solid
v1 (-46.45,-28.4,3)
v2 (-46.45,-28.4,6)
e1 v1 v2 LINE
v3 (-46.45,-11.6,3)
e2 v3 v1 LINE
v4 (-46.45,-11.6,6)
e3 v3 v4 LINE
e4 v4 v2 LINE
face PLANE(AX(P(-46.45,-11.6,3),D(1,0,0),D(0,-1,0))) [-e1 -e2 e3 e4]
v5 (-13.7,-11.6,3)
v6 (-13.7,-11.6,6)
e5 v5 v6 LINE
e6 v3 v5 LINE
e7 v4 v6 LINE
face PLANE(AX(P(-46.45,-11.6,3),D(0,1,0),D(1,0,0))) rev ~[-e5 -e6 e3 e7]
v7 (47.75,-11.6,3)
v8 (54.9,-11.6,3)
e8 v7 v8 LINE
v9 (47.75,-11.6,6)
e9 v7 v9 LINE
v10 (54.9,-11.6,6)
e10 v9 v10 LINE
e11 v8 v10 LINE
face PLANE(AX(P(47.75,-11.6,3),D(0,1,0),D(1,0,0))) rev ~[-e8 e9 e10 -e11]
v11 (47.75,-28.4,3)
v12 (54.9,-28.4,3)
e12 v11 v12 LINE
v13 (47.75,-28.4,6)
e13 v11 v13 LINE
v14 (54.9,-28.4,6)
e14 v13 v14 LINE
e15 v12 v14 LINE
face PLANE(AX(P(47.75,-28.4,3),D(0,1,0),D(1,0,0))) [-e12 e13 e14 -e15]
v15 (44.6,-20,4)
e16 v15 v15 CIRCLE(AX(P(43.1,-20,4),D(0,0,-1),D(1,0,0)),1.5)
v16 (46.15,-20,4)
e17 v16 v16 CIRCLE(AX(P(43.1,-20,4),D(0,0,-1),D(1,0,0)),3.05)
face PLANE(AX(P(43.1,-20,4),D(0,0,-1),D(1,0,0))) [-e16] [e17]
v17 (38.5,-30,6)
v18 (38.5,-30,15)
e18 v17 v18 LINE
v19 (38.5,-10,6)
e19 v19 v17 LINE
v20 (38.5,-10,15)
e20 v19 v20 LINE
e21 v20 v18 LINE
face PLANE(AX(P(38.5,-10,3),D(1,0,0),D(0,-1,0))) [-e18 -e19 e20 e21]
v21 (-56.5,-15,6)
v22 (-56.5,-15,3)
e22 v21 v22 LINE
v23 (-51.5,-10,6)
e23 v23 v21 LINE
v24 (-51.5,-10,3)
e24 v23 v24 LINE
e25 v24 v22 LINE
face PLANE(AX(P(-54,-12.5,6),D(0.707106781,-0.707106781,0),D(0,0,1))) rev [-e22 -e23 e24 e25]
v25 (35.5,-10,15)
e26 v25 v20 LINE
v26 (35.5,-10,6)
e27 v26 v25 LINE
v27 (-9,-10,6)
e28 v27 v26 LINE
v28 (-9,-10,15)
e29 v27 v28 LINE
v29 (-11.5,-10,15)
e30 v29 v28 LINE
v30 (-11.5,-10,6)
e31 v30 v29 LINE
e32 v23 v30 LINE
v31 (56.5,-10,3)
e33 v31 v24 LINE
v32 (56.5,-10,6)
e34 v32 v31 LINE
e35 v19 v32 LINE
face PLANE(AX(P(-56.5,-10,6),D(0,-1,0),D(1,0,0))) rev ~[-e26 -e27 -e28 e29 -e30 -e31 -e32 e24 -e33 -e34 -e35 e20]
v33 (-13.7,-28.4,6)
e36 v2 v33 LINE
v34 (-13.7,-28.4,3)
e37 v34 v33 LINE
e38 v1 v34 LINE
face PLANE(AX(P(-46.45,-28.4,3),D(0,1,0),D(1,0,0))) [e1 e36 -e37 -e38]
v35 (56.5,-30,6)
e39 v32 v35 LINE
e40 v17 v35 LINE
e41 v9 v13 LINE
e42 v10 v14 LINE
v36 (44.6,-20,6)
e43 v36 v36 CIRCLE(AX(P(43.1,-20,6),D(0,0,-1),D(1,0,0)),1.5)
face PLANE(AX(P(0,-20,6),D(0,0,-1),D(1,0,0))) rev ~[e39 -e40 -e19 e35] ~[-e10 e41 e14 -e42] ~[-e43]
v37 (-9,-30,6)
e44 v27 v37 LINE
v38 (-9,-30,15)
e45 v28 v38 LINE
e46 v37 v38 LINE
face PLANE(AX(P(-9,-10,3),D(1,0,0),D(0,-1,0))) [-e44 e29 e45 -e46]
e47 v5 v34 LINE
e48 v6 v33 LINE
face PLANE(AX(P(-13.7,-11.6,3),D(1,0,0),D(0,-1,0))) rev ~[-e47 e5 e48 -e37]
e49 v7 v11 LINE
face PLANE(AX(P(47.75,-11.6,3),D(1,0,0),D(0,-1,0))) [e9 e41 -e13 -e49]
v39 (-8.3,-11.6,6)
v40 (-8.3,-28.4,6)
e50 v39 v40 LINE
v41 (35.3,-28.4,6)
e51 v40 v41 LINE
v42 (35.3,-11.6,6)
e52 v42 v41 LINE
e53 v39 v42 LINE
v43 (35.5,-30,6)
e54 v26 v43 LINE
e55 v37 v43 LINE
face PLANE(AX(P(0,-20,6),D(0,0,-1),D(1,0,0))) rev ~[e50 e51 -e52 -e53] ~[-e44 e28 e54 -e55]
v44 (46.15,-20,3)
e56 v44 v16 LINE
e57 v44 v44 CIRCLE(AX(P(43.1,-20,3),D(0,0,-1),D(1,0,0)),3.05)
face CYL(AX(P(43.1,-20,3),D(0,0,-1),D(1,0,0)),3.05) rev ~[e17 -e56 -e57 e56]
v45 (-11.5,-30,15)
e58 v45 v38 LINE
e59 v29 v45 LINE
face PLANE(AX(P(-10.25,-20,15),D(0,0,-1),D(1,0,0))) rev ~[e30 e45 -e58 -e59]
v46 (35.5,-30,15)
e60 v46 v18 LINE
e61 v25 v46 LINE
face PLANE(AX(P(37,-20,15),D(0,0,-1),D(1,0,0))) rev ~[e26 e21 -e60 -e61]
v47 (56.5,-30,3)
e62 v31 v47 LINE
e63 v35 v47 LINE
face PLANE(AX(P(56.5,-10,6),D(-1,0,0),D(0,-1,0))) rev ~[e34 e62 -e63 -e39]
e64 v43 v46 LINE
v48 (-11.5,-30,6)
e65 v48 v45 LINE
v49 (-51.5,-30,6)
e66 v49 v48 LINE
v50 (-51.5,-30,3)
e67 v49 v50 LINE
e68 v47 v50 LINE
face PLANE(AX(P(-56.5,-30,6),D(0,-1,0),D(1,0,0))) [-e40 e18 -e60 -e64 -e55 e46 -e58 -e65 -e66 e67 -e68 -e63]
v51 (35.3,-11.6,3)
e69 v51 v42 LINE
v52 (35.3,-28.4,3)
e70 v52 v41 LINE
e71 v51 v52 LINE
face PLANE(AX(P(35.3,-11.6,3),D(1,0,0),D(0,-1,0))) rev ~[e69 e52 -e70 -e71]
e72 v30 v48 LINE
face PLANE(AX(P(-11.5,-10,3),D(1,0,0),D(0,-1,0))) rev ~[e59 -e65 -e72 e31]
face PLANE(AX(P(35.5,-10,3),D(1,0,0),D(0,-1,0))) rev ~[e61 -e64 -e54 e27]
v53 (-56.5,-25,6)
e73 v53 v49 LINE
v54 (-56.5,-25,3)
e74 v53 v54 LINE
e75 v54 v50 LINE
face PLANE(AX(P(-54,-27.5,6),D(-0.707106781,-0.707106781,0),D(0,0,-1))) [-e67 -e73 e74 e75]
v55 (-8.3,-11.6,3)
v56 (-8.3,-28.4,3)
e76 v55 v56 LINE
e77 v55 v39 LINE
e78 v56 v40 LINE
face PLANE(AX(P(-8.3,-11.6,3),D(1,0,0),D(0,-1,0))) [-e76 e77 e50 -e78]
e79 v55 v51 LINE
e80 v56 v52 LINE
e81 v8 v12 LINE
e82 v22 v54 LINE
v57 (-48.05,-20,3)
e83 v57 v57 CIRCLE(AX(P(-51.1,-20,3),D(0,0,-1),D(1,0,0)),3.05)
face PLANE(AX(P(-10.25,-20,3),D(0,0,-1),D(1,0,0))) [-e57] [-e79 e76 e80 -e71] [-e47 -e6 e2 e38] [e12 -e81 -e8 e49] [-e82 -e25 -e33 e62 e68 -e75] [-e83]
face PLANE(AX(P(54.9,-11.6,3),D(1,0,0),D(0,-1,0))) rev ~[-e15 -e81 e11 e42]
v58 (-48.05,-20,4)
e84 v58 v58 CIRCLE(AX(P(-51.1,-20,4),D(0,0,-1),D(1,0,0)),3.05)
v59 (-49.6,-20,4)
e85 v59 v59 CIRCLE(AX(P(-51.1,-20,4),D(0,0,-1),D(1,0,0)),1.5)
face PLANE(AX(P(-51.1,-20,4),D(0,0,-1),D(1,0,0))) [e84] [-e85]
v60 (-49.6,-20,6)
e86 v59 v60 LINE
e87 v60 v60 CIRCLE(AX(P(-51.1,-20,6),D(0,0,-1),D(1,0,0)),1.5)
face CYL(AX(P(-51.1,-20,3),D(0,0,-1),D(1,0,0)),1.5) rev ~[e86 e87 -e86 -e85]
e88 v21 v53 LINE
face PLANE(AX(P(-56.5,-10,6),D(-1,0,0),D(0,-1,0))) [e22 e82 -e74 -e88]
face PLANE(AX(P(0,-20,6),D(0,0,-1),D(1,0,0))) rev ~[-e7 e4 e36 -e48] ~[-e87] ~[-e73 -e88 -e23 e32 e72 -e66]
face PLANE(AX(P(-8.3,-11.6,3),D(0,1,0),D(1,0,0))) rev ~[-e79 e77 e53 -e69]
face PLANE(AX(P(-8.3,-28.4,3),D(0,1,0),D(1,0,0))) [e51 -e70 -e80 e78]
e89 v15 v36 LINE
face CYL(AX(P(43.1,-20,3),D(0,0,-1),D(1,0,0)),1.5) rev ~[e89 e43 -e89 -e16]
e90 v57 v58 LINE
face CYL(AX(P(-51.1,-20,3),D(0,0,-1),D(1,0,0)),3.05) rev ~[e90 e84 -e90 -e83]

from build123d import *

# Parameters (mm, degrees)
F0_W      = 113
F0_H      = 20
F1_DEPTH  = 3
F2_W      = 2.5
F2_H      = 20
F2_W_2    = 3
F3_DEPTH  = 12
F4_R      = 1.5
F5_DEPTH  = 3
F6_R      = 3.05
F6_R_2    = 1.5
F7_DEPTH  = 1
F8_W      = 32.75
F8_H      = 16.8
F8_W_2    = 43.6
F8_W_3    = 7.15
F9_DEPTH  = 3
F10_SIZE  = 5
F11_ANGLE = 180


# Not quite as in the source:
# - a feature of the source that left no trace in its solid (it failed there, or was rolled back) is left out


with BuildPart() as f1:
    # F0 (on Top) → F1 (new body)
    with BuildSketch(Plane.XY):
        Rectangle(F0_W, F0_H)
    extrude(amount=F1_DEPTH)

    # F2 (on face) → F3 (join)
    with BuildSketch(Plane.XY.offset(3)):
        with Locations((-10.25, 0)):
            Rectangle(F2_W, F2_H)
        with Locations((37, 0)):
            Rectangle(F2_W_2, F2_H)
    extrude(amount=-F3_DEPTH)

    # F4 (on face) → F5 (cut, through all)
    with BuildSketch(Plane.XY.offset(3)):
        with Locations((-51.1, 0)):
            Circle(F4_R)
        with Locations((43.1, 0)):
            Circle(F4_R)
    extrude(amount=-F5_DEPTH, mode=Mode.SUBTRACT)

    # F6 (on face) → F7 (cut)
    with BuildSketch(Plane.XY.offset(3)):
        with Locations((-51.1, 0)):
            Circle(F6_R)
        with Locations((-51.1, 0)):
            Circle(F6_R_2, mode=Mode.SUBTRACT)
        with Locations((43.1, 0)):
            Circle(F6_R)
        with Locations((43.1, 0)):
            Circle(F6_R_2, mode=Mode.SUBTRACT)
    extrude(amount=-F7_DEPTH, mode=Mode.SUBTRACT)

    # F8 (on face) → F9 (cut, through all)
    with BuildSketch(Plane.XY.offset(3)):
        with Locations((-30.075, 0)):
            Rectangle(F8_W, F8_H)
        with Locations((13.5, 0)):
            Rectangle(F8_W_2, F8_H)
        with Locations((51.325, 0)):
            Rectangle(F8_W_3, F8_H)
    extrude(amount=-F9_DEPTH, mode=Mode.SUBTRACT)

    # F10
    f10_edges = [f1.edges().sort_by_distance(p)[0] for p in [
        (-56.5, 10, 1.5),
        (-56.5, -10, 1.5),
    ]]
    chamfer(f10_edges, length=F10_SIZE)


with BuildPart() as f1_1:
    # F11: moved
    add(f1.part.rotate(Axis((2.5, -10, 3), (-1, 0, 0)), F11_ANGLE))


solid = f1_1.part
